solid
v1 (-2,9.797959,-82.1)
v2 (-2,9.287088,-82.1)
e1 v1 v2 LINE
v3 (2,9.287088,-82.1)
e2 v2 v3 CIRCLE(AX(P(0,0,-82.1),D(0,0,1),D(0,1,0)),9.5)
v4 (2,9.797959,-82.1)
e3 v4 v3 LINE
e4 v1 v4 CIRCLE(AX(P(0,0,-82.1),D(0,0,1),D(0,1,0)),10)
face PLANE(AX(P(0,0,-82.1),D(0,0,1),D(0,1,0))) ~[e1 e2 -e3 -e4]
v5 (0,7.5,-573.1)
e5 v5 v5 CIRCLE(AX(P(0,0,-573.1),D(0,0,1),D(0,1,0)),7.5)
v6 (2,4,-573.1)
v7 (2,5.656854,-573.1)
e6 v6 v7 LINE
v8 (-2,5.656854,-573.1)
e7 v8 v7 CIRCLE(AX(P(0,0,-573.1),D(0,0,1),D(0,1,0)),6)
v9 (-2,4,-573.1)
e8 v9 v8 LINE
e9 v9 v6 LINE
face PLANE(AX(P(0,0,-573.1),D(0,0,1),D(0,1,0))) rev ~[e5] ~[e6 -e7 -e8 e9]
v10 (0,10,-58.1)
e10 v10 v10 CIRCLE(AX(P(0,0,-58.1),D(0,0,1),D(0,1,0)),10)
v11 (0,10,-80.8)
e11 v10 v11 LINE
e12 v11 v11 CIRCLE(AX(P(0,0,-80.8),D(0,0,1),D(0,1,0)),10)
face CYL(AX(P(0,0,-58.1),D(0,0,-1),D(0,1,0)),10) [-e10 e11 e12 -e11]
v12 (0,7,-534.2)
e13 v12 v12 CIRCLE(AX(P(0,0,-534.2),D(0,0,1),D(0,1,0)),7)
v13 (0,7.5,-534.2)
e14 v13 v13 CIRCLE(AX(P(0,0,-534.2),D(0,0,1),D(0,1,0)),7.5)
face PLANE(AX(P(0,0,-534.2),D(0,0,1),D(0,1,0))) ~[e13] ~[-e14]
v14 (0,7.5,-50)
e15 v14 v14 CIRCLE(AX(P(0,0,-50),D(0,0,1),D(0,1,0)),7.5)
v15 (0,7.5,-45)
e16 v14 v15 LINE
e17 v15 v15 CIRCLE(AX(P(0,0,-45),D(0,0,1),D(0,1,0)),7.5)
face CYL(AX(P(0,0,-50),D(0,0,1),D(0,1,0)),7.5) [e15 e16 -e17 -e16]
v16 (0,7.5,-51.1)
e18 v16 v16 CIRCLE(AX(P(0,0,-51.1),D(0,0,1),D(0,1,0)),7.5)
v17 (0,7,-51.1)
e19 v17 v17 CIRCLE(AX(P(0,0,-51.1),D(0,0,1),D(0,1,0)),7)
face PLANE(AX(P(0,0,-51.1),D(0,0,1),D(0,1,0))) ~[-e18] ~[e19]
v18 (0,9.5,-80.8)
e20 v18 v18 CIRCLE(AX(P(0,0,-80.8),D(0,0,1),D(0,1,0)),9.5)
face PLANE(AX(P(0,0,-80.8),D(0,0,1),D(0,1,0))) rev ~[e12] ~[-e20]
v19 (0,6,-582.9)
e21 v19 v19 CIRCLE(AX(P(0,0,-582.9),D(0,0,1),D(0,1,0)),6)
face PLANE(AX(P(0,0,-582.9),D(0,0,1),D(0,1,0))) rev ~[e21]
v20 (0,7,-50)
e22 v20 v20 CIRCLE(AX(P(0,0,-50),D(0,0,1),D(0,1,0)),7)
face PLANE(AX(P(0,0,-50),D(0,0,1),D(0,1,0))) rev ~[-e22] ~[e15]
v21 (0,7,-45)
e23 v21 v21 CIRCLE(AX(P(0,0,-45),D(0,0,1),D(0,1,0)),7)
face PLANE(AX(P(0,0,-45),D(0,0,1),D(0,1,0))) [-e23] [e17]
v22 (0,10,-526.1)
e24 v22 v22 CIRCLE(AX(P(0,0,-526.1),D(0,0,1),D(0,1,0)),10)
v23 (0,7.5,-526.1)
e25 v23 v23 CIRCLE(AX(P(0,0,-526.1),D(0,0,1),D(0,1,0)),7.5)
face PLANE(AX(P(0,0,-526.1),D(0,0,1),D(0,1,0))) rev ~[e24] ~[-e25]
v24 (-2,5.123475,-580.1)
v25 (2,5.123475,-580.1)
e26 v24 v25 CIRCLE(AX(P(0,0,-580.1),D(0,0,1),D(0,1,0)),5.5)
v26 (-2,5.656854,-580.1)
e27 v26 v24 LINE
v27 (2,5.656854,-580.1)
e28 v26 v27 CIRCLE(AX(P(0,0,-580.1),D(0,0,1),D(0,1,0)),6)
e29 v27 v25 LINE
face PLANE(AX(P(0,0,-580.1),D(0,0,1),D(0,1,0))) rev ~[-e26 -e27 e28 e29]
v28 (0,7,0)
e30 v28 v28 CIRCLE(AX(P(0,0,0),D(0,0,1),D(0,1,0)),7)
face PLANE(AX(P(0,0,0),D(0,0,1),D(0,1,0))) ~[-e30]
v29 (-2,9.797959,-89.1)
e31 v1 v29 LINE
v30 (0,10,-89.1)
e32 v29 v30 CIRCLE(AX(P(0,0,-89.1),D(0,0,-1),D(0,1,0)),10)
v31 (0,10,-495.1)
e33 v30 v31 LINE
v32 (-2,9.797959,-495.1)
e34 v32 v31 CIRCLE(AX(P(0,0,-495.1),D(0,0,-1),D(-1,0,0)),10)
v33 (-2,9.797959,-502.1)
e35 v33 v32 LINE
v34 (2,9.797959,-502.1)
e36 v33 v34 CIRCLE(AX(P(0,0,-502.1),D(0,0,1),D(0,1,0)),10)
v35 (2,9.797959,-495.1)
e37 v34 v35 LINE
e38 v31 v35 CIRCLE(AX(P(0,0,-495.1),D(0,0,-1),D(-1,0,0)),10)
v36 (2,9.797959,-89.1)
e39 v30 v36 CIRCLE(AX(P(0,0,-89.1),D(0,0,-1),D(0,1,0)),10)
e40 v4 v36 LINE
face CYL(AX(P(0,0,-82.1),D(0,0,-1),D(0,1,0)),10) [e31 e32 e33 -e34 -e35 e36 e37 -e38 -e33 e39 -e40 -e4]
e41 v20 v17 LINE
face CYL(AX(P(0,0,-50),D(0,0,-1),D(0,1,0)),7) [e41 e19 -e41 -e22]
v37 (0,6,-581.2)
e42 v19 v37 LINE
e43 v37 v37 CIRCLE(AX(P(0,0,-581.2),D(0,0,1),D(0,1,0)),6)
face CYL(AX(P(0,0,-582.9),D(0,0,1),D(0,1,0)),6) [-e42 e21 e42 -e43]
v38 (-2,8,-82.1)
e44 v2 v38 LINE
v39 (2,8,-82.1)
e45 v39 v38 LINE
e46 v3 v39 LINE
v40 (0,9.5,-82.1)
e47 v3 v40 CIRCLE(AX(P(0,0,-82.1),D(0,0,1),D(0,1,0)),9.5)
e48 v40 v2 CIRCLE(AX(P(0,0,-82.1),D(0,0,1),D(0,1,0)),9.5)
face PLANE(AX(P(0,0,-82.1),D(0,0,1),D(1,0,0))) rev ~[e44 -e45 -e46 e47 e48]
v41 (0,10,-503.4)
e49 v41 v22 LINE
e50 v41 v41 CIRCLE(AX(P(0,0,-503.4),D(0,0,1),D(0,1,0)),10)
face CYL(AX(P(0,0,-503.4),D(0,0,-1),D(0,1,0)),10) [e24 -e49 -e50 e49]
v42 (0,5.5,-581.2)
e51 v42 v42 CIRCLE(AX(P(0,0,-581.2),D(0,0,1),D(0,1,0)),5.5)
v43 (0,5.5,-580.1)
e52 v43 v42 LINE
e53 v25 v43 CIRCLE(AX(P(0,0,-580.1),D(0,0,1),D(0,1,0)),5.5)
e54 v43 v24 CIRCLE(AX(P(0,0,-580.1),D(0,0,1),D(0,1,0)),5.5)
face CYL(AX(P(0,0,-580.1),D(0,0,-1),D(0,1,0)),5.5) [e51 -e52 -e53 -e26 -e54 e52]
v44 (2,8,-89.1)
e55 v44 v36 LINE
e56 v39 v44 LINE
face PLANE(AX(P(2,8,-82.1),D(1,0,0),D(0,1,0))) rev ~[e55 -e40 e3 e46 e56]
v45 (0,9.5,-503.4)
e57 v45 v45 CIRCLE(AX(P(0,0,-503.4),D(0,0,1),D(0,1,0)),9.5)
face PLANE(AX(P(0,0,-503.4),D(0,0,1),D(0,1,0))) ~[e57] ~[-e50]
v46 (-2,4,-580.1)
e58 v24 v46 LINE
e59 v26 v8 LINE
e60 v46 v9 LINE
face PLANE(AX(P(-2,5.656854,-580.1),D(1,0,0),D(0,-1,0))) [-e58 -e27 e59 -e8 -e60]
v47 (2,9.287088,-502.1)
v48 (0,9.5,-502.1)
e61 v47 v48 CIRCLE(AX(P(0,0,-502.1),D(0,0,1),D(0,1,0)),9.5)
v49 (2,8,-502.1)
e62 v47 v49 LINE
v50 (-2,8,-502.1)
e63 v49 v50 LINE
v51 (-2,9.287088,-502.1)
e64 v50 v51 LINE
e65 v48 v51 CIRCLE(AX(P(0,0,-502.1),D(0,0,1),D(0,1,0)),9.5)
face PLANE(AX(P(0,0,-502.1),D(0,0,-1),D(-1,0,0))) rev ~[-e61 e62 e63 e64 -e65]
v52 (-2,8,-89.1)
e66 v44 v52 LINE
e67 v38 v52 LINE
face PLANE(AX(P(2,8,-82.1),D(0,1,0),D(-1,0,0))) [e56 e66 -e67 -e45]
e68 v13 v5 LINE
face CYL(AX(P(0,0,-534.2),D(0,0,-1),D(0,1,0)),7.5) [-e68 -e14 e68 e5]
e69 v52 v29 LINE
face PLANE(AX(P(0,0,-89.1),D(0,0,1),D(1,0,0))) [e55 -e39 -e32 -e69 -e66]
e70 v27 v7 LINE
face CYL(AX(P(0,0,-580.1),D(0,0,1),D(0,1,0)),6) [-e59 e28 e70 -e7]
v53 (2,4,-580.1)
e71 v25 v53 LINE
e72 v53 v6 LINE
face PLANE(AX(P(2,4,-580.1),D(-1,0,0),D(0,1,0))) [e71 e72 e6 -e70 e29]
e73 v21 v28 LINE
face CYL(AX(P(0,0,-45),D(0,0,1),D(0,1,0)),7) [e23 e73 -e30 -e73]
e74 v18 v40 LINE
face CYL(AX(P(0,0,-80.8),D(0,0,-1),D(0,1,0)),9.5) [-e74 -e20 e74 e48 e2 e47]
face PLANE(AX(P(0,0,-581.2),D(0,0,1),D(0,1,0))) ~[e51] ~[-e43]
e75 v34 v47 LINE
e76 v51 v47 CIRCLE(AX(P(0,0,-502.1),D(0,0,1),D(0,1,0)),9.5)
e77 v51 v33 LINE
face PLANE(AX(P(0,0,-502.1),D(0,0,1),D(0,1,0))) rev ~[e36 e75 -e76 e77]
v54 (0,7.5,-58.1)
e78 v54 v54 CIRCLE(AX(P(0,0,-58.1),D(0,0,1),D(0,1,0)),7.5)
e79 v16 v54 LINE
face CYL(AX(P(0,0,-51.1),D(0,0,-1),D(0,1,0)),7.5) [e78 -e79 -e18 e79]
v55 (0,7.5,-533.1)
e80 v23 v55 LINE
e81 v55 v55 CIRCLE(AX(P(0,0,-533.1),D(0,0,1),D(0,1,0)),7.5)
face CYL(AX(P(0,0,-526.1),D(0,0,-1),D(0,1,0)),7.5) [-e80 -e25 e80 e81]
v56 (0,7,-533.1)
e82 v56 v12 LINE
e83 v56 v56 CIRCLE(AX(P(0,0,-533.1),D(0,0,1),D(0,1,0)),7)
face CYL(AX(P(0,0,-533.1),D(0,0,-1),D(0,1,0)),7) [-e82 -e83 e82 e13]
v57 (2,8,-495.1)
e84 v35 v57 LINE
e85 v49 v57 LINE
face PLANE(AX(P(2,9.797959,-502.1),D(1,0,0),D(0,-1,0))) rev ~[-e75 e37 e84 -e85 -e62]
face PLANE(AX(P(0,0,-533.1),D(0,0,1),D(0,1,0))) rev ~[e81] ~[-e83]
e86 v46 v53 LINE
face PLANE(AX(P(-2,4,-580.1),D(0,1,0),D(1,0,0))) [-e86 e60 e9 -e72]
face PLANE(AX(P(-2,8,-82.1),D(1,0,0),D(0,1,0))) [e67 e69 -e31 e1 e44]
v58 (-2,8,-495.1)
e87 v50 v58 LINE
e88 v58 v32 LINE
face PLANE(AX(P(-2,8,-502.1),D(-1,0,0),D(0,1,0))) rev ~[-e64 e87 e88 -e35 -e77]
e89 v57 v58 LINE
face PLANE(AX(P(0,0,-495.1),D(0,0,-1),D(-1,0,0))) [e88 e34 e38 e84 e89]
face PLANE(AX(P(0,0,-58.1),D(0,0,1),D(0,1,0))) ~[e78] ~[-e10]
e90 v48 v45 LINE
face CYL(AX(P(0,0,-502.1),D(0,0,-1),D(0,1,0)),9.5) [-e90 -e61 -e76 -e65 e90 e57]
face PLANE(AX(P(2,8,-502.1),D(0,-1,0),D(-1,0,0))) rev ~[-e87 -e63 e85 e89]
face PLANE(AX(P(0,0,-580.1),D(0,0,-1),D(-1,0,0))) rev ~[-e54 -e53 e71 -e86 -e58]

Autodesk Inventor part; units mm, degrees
ref_plane "YZ Plane" through (0, 0, 0) normal (1, 0, 0) x (0, 1, 0)
ref_plane "XZ Plane" through (0, 0, 0) normal (0, 1, 0) x (-1, 0, 0)
ref_plane "XY Plane" through (0, 0, 0) normal (0, 0, 1) x (1, 0, 0)
sketch "Sketch1" plane through (0, 0, 0) normal (1, 0, 0) x (0, 1, 0)
  line L0 (0, 0) -> (7, 0)
  line L1 (7.5, -50) -> (7, -50)
  line L2 (7, -50) -> (7, -51.1)
  line L3 (7, -51.1) -> (7.5, -51.1)
  line L4 (7.5, -51.1) -> (7.5, -58.1)
  line L5 (7.5, -58.1) -> (10, -58.1)
  line L6 (10, -58.1) -> (10, -80.8)
  line L7 (10, -80.8) -> (9.5, -80.8)
  line L8 (9.5, -80.8) -> (9.5, -82.1)
  line L9 (9.5, -82.1) -> (10, -82.1)
  line L10 (10, -82.1) -> (10, -502.1)
  line L11 (10, -502.1) -> (9.5, -502.1)
  line L12 (9.5, -502.1) -> (9.5, -503.4)
  line L13 (9.5, -503.4) -> (10, -503.4)
  line L14 (10, -503.4) -> (10, -526.1)
  line L15 (10, -526.1) -> (7.5, -526.1)
  line L16 (7.5, -526.1) -> (7.5, -533.1)
  line L17 (7.5, -533.1) -> (7, -533.1)
  line L18 (7, -533.1) -> (7, -534.2)
  line L19 (7, -534.2) -> (7.5, -534.2)
  line L20 (7.5, -534.2) -> (7.5, -573.1)
  line L21 (7.5, -573.1) -> (0, -573.1)
  line L22 (0, -573.1) -> (0, 0)
  line L23 (6, -573.1) -> (6, -582.9) construction
  line L24 (6, -582.9) -> (0, -582.9)
  line L25 (0, -582.9) -> (0, -573.1)
  line L26 (6, -580.1) -> (5.5, -580.1)
  line L27 (5.5, -580.1) -> (5.5, -581.2)
  line L28 (5.5, -581.2) -> (6, -581.2)
  line L29 (6, -582.9) -> (6, -581.2)
  line L30 (6, -580.1) -> (6, -573.1)
  line L31 (7.5, -50) -> (7.5, -45)
  line L32 (7.5, -45) -> (7, -45)
  line L33 (7, -45) -> (7, 0)
  line L34 (0, 0) -> (7, 0)
  point P0 (8.75, -526.1)
  point P1 (9.75, -82.1)
  point P2 (9.75, -502.1)
  point P3 (7.5, -47.5)
  point P4 (7, -50.55)
  dimension "d15" = 50
  dimension "d16" = 1.1
  dimension "d17" = 7
  dimension "d18" = 10
  dimension "d19" = 0.5
  dimension "d20" = 1.3
  dimension "d21" = 1.3
  dimension "d22" = 7.5
  dimension "d23" = 0.5
  dimension "d24" = 1.1
  dimension "d25" = 7
  dimension "d26" = 468
  dimension "d27" = 47
  dimension "d28" = 420
  dimension "d29" = 24
  dimension "d32" = 6
  dimension "d33" = 0.5
  dimension "d34" = 7
  dimension "d35" = 1.1
  dimension "d36" = 1.7
  dimension "d52" = 5
  dimension "d53" = 7
  dimension "d54" = 7.5
  dimension "d55" = 7
  dimension "d56" = 7.5
revolve "Revolution1" add sketch "Sketch1" angle 360 about axis through (0, 0, -573.1) along (0, 0, 1)
sketch "Sketch2" plane through (0, 0, -580.1) normal (0, 0, -1) x (-1, 0, 0)
  circle A0 centre (0, 0) radius 6 projected
  circle A1 centre (0, 0) radius 6 projected
  line L0 (0, 6) -> (2, 6)
  line L1 (2, 6) -> (2, 4)
  line L2 (2, 4) -> (-2, 4)
  line L3 (-2, 4) -> (-2, 6)
  line L4 (-2, 6) -> (0, 6)
  dimension "d37" = 2
  dimension "d38" = 2
  dimension "d39" = 4
extrude "Extrusion1" cut sketch "Sketch2" against normal blind 7 contours L1 L2 L3 A0 | A0 L0 L1 | L3 L4 A0 picked at (0, 4.6667)
sketch "Sketch3" plane through (0, 0, -502.1) normal (0, 0, -1) x (-1, 0, 0)
  circle A0 centre (0, 0) radius 10 projected
  line L0 (0, 10) -> (-2, 10)
  line L1 (-2, 10) -> (-2, 8)
  line L2 (-2, 8) -> (2, 8)
  line L3 (2, 8) -> (2, 10)
  line L4 (2, 10) -> (0, 10)
  point P0 (2, 9.798)
  point P1 (-2, 9.798)
  dimension "d42" = 2
  dimension "d43" = 2
  dimension "d44" = 4
extrude "Extrusion2" cut sketch "Sketch3" against normal blind 7 contours L3 L2 L1 A0 picked at (0, 8.6667)
sketch "Sketch4" plane through (0, 0, -82.1) normal (0, 0, 1) x (1, 0, 0)
  circle A0 centre (0, 0) radius 10 projected
  line L0 (0, 10) -> (-2, 10)
  line L1 (-2, 8) -> (-2, 9.2871) projected
  line L2 (-2, 10) -> (-2, 8)
  line L3 (2, 8) -> (-2, 8) projected
  line L4 (-2, 8) -> (2, 8)
  line L5 (2, 8) -> (2, 10)
  line L6 (2, 10) -> (0, 10)
  point P0 (0, 0)
  point P1 (-2, 9.2871)
  dimension "d47" = 2
  dimension "d48" = 2
  dimension "d49" = 4
extrude "Extrusion3" cut sketch "Sketch4" against normal blind 7 contours L5 L3 L1 L2 A0 | A0 L6 L5 | L2 L0 A0 picked at (0, 8.6667)
properties part number "P201" material "Steel, Mild"
